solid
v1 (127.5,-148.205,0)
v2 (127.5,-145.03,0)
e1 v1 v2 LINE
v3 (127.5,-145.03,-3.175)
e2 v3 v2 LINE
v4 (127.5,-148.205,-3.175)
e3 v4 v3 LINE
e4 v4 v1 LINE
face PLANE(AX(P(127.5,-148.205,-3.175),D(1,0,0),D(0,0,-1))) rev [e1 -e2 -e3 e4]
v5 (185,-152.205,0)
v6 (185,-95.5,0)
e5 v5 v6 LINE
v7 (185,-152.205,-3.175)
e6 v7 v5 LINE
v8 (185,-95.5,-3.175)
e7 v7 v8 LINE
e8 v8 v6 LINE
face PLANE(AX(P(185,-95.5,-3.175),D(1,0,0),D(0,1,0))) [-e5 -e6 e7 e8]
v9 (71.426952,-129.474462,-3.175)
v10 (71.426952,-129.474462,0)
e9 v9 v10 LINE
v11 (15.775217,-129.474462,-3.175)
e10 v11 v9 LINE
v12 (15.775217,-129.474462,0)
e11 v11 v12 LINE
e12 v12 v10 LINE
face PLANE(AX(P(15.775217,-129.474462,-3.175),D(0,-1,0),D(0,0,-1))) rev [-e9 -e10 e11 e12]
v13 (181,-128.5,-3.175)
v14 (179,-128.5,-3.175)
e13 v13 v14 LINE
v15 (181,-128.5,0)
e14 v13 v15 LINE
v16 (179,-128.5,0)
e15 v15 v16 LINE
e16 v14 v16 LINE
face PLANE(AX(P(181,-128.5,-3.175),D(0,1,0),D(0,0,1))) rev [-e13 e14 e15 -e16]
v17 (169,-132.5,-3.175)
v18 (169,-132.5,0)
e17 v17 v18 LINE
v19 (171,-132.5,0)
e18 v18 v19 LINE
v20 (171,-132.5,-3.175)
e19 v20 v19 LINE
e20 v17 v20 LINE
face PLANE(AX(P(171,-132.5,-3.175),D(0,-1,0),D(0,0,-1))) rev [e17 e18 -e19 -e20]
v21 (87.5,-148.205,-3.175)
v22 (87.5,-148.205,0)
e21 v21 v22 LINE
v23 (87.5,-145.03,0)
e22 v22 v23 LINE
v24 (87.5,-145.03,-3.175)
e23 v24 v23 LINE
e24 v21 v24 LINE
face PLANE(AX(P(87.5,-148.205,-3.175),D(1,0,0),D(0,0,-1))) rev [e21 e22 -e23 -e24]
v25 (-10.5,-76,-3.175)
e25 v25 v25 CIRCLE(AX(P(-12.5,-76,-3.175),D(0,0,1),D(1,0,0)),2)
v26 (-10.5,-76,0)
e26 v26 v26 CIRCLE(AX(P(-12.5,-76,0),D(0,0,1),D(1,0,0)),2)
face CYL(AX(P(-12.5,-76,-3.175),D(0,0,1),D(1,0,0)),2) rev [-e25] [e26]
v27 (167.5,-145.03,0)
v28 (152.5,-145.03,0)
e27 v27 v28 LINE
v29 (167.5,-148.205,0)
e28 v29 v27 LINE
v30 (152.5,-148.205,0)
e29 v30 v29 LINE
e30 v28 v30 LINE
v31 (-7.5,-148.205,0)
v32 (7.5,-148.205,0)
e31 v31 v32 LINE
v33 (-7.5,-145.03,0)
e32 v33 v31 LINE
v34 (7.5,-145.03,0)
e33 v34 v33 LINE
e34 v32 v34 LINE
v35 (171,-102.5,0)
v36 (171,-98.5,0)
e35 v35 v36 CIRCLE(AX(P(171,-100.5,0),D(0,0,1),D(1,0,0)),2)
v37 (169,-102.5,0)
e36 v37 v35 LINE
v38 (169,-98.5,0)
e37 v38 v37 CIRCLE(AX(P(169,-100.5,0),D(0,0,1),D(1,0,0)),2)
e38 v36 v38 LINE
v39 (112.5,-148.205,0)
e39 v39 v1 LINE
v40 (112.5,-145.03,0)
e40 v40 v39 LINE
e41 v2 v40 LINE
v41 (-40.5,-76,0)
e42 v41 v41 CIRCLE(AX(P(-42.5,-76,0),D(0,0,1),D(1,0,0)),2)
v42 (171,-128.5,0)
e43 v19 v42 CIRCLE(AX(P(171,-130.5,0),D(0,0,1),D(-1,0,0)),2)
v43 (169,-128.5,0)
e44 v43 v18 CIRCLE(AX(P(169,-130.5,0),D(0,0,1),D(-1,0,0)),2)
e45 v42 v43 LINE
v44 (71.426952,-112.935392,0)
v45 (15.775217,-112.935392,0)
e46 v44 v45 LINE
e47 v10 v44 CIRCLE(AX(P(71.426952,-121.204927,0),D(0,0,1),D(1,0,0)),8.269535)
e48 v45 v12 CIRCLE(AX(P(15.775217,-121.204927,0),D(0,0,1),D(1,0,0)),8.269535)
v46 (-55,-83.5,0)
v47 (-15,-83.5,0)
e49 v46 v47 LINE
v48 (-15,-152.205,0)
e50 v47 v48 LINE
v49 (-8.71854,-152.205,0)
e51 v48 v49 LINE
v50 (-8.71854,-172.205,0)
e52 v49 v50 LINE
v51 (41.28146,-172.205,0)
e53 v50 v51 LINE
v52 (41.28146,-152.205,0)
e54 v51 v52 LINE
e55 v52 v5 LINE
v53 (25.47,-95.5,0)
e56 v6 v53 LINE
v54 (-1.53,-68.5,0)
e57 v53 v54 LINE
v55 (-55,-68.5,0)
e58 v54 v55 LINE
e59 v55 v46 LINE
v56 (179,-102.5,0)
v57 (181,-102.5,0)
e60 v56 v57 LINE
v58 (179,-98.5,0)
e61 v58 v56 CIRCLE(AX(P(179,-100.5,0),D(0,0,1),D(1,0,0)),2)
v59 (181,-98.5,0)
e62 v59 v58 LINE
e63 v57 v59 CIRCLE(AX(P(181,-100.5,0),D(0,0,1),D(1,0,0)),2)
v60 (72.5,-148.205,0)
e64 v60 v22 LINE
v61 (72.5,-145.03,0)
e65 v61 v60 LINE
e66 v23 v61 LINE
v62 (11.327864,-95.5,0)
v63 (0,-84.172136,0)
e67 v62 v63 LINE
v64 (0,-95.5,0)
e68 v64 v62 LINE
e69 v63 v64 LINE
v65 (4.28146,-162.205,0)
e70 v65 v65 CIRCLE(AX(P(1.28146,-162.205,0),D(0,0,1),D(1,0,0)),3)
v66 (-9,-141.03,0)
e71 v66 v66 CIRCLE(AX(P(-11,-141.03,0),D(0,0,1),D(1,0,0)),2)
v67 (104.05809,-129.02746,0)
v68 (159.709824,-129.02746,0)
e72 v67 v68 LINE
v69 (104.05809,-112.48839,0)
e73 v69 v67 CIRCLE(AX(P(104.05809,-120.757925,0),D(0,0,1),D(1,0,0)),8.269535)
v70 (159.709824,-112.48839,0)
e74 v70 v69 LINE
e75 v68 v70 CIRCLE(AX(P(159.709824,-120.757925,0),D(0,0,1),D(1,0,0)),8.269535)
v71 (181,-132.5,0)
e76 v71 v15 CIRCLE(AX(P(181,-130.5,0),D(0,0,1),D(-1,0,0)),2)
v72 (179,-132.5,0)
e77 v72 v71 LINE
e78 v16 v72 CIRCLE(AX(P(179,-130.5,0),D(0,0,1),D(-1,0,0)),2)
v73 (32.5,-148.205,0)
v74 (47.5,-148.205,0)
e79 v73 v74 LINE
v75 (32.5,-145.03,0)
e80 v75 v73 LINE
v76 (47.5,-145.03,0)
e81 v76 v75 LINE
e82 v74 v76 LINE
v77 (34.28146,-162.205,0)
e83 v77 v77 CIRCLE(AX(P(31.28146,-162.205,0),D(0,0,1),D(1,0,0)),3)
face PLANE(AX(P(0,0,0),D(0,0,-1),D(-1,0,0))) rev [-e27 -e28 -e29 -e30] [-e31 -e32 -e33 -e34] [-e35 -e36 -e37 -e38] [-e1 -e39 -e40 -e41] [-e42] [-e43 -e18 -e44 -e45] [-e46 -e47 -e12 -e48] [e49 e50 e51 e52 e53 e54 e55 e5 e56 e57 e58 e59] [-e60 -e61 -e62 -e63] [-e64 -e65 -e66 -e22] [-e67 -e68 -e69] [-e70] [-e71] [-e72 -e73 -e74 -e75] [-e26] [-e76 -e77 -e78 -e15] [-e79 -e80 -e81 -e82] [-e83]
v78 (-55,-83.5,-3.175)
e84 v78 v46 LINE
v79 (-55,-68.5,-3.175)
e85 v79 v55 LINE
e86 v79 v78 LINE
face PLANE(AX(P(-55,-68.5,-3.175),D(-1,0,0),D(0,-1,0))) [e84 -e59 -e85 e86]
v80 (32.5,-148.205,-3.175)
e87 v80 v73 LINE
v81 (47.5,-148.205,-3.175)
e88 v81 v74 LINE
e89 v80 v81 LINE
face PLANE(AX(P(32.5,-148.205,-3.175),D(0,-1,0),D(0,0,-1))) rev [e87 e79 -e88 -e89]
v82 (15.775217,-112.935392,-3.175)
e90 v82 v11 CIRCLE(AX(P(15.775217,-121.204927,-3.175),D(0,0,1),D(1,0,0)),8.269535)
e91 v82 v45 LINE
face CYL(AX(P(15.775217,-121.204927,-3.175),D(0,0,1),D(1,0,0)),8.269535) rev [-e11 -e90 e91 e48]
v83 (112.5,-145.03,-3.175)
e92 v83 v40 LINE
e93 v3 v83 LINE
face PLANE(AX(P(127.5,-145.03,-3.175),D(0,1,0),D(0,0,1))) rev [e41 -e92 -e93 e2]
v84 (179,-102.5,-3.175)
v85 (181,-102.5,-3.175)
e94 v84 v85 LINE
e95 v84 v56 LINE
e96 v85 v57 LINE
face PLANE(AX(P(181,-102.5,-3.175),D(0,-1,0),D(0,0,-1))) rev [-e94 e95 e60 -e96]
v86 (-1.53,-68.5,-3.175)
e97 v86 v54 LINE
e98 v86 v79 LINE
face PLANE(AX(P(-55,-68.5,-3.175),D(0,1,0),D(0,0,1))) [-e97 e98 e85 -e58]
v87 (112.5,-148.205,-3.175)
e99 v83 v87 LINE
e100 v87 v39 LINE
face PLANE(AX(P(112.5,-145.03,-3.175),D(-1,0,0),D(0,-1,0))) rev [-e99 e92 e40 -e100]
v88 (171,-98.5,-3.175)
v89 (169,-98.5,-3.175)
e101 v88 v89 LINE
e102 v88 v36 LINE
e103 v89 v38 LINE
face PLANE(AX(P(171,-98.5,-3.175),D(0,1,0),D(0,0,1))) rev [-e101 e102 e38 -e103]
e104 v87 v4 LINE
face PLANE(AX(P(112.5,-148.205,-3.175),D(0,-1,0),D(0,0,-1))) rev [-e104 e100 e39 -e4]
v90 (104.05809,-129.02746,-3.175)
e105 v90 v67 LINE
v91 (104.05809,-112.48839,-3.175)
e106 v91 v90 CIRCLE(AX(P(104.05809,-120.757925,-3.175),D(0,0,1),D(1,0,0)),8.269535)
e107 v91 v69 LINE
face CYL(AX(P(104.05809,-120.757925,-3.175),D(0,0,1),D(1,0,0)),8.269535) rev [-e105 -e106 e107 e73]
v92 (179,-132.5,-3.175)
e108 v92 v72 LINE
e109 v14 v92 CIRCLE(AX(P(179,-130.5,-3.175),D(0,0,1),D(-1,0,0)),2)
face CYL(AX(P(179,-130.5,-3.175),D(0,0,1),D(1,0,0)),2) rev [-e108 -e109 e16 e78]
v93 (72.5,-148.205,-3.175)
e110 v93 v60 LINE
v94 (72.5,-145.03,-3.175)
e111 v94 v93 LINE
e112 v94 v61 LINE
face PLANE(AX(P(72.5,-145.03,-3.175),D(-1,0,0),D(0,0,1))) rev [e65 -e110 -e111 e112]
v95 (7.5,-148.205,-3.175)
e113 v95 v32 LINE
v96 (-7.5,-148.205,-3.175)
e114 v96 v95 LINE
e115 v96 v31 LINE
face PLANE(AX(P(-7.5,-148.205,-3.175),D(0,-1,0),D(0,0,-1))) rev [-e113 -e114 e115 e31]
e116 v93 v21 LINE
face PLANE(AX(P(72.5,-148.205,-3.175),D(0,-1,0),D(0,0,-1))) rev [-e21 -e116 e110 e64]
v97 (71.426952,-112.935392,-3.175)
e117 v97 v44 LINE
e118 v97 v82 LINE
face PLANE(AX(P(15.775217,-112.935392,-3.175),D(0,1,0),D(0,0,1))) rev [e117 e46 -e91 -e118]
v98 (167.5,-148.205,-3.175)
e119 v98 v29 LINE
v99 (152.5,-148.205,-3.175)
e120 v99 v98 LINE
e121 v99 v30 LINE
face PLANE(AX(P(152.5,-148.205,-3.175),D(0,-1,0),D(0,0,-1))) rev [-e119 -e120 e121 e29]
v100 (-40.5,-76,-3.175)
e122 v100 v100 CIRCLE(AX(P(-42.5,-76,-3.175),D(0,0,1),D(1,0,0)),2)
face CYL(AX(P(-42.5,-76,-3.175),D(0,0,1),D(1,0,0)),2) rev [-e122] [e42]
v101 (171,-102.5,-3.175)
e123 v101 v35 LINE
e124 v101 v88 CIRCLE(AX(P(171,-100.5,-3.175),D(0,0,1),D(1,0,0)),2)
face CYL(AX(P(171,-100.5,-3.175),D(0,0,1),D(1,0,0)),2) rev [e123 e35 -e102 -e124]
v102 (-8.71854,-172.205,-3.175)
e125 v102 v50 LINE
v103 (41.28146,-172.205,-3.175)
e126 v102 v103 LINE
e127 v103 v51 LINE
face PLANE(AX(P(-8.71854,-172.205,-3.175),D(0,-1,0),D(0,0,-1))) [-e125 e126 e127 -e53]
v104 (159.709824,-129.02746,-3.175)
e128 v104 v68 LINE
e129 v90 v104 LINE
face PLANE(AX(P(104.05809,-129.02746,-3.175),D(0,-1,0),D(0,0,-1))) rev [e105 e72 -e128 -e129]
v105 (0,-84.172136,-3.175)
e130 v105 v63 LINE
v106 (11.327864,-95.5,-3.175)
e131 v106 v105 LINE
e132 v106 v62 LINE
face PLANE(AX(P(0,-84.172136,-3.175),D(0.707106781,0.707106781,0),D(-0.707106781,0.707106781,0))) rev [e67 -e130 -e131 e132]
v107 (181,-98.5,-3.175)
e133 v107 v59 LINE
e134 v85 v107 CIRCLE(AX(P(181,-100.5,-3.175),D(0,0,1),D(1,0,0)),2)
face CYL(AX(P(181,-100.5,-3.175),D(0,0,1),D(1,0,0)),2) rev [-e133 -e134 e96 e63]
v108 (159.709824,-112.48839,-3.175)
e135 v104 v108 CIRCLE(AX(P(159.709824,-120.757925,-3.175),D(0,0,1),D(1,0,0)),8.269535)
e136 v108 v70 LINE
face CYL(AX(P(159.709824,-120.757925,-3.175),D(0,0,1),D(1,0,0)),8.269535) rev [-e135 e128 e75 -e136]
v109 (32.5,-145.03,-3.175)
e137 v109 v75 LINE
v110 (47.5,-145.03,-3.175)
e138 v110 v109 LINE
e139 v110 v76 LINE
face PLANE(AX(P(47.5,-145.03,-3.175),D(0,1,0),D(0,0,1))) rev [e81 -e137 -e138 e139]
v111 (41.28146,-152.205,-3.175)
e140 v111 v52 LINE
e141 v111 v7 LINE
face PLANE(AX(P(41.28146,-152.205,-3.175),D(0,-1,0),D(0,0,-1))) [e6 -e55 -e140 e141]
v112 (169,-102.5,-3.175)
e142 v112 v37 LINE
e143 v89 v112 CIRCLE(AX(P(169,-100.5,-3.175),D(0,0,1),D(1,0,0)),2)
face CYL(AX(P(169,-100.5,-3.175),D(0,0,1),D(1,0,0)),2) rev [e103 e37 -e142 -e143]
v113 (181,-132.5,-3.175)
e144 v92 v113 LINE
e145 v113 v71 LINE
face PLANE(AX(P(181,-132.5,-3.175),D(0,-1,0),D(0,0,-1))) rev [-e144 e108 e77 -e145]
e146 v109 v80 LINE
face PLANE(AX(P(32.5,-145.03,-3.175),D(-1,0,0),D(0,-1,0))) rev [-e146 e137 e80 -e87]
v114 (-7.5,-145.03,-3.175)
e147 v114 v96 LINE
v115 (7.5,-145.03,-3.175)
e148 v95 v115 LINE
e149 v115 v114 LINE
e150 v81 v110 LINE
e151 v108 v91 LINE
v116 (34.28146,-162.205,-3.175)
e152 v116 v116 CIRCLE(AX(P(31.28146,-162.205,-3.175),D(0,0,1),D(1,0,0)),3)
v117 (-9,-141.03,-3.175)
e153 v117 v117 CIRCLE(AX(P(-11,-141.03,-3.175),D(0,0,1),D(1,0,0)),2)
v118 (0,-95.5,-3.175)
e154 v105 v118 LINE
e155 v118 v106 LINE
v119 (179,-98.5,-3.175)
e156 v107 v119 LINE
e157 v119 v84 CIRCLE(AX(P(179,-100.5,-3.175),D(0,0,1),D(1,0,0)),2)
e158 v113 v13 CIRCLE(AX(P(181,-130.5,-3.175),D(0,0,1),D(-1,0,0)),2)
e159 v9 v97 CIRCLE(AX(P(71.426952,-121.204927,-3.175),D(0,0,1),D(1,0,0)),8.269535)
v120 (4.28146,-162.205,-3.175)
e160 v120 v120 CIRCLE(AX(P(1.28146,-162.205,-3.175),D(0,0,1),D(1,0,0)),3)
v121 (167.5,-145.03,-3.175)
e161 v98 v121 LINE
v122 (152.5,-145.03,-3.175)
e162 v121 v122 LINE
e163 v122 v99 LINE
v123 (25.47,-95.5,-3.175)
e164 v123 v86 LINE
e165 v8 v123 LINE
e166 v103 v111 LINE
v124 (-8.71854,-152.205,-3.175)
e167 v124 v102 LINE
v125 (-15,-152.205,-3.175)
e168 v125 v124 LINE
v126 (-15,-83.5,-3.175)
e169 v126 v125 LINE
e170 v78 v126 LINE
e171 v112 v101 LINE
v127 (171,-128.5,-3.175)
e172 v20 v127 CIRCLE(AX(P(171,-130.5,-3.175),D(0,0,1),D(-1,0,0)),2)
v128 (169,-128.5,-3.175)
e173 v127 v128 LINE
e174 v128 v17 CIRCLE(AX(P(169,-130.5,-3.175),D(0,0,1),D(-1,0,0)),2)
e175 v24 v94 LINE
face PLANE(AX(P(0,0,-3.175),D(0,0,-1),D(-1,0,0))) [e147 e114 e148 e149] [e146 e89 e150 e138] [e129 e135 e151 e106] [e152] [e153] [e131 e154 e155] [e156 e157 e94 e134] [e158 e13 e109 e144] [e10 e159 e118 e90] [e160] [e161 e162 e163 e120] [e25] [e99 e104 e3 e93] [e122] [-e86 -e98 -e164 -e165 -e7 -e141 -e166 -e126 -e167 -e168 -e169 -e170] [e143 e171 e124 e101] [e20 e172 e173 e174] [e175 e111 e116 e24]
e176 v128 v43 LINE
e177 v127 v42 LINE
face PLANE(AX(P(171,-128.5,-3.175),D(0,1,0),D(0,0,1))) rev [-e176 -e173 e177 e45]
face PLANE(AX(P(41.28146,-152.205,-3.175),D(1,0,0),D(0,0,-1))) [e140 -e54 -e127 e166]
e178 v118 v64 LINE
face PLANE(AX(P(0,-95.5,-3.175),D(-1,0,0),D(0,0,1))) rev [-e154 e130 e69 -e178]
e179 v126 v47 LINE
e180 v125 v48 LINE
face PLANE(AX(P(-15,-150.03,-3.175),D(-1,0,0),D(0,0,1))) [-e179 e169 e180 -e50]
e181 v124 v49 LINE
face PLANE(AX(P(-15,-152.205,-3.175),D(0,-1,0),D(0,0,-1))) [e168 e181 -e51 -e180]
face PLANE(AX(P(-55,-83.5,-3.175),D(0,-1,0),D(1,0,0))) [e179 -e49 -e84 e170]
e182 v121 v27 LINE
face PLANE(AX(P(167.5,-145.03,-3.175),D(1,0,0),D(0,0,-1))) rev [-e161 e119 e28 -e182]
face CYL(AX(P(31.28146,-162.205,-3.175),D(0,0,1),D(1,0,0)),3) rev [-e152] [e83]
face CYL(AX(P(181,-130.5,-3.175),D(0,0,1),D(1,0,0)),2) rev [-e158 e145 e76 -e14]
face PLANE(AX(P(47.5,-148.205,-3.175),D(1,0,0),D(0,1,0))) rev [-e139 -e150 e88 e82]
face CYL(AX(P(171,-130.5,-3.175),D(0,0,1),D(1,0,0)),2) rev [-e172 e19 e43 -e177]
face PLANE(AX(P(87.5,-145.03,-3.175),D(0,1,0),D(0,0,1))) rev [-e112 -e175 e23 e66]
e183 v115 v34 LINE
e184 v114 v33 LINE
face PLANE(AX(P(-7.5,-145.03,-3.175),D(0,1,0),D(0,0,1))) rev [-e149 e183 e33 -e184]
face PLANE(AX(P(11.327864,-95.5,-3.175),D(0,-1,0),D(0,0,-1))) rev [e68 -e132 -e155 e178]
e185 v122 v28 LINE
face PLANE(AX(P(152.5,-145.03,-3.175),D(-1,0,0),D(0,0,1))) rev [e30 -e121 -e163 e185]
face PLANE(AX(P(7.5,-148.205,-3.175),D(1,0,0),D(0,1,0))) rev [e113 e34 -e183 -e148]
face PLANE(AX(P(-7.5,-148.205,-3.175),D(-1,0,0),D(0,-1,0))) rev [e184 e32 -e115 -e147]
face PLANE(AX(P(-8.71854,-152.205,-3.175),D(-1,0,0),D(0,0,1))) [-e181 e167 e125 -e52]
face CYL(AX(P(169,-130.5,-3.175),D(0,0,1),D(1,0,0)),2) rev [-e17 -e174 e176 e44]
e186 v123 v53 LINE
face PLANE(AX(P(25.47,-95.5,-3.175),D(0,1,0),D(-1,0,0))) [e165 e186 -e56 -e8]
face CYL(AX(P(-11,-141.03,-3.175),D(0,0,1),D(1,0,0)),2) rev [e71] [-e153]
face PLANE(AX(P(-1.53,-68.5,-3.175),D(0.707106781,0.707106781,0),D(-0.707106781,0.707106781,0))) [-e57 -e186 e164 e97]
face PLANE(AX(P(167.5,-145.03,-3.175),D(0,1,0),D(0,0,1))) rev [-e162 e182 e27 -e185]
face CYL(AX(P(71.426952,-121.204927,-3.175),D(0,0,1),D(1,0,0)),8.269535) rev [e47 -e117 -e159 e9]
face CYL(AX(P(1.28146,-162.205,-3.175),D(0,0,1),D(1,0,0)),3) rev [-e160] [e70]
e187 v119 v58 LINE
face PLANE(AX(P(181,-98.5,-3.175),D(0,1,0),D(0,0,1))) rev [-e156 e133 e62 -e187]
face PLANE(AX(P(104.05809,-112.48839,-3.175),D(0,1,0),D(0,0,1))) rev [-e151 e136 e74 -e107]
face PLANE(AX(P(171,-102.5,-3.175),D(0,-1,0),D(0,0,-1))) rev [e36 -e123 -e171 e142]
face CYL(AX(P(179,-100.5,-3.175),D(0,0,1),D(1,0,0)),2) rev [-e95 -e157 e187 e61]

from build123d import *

# Parameters (mm, degrees)
SKETCH1_R          = 3
SKETCH1_R_2        = 2
SKETCH1_W          = 15
SKETCH1_H          = 3.175
BASE_FLANGE1_DEPTH = 3.175


# Sheet-metal steps are written as plain solids
with BuildPart() as part:
    # Sketch1 → Base-Flange1 (new body)
    with BuildSketch(Plane.XY):
        Polygon((-1.53, -68.5), (25.47, -95.5), (185, -95.5), (185, -143.5), (185, -148.5), (185, -152.205), (41.281460478, -152.205), (41.281460478, -172.205), (-8.718539522, -172.205), (-8.718539522, -152.205), (-15, -152.205), (-15, -150.03), (-15, -83.5), (-55, -83.5), (-55, -68.5), align=None)
        with Locations((1.281460478, -162.205)):
            Circle(SKETCH1_R, mode=Mode.SUBTRACT)
        with Locations((31.281460478, -162.205)):
            Circle(SKETCH1_R, mode=Mode.SUBTRACT)
        with Locations((-42.5, -76)):
            Circle(SKETCH1_R_2, mode=Mode.SUBTRACT)
        with Locations((-12.5, -76)):
            Circle(SKETCH1_R_2, mode=Mode.SUBTRACT)
        with Locations((-11, -141.03)):
            Circle(SKETCH1_R_2, mode=Mode.SUBTRACT)
        with Locations((160, -146.6175)):
            Rectangle(SKETCH1_W, SKETCH1_H, mode=Mode.SUBTRACT)
        with Locations((40, -146.6175)):
            Rectangle(SKETCH1_W, SKETCH1_H, mode=Mode.SUBTRACT)
        with Locations((0, -146.6175)):
            Rectangle(SKETCH1_W, SKETCH1_H, mode=Mode.SUBTRACT)
        Polygon((0, -84.172135624), (11.327864376, -95.5), (0, -95.5), align=None, mode=Mode.SUBTRACT)
        with Locations((80, -146.6175)):
            Rectangle(SKETCH1_W, SKETCH1_H, mode=Mode.SUBTRACT)
        with Locations((120, -146.6175)):
            Rectangle(SKETCH1_W, SKETCH1_H, mode=Mode.SUBTRACT)
        with BuildLine():
            Line((104.058089569, -112.488390285), (159.709824243, -112.488390285))
            ThreePointArc((159.709824243, -112.488390285), (167.979359115, -120.757925156), (159.709824243, -129.027460028))
            Line((159.709824243, -129.027460028), (104.058089569, -129.027460028))
            ThreePointArc((104.058089569, -129.027460028), (95.788554697, -120.757925156), (104.058089569, -112.488390285))
        make_face(mode=Mode.SUBTRACT)
        with BuildLine():
            Line((15.775217294, -112.93539217), (71.426951968, -112.93539217))
            ThreePointArc((71.426951968, -112.93539217), (79.69648684, -121.204927041), (71.426951968, -129.474461913))
            Line((71.426951968, -129.474461913), (15.775217294, -129.474461913))
            ThreePointArc((15.775217294, -129.474461913), (7.505682422, -121.204927041), (15.775217294, -112.93539217))
        make_face(mode=Mode.SUBTRACT)
        with BuildLine():
            Line((181, -102.5), (179, -102.5))
            ThreePointArc((179, -102.5), (177, -100.5), (179, -98.5))
            Line((179, -98.5), (181, -98.5))
            ThreePointArc((181, -98.5), (183, -100.5), (181, -102.5))
        make_face(mode=Mode.SUBTRACT)
        with BuildLine():
            Line((171, -102.5), (169, -102.5))
            ThreePointArc((169, -102.5), (167, -100.5), (169, -98.5))
            Line((169, -98.5), (171, -98.5))
            ThreePointArc((171, -98.5), (173, -100.5), (171, -102.5))
        make_face(mode=Mode.SUBTRACT)
        with BuildLine():
            Line((171, -128.5), (169, -128.5))
            ThreePointArc((169, -128.5), (167, -130.5), (169, -132.5))
            Line((169, -132.5), (171, -132.5))
            ThreePointArc((171, -132.5), (173, -130.5), (171, -128.5))
        make_face(mode=Mode.SUBTRACT)
        with BuildLine():
            Line((181, -128.5), (179, -128.5))
            ThreePointArc((179, -128.5), (177, -130.5), (179, -132.5))
            Line((179, -132.5), (181, -132.5))
            ThreePointArc((181, -132.5), (183, -130.5), (181, -128.5))
        make_face(mode=Mode.SUBTRACT)
    extrude(amount=-BASE_FLANGE1_DEPTH)


solid = part.part
